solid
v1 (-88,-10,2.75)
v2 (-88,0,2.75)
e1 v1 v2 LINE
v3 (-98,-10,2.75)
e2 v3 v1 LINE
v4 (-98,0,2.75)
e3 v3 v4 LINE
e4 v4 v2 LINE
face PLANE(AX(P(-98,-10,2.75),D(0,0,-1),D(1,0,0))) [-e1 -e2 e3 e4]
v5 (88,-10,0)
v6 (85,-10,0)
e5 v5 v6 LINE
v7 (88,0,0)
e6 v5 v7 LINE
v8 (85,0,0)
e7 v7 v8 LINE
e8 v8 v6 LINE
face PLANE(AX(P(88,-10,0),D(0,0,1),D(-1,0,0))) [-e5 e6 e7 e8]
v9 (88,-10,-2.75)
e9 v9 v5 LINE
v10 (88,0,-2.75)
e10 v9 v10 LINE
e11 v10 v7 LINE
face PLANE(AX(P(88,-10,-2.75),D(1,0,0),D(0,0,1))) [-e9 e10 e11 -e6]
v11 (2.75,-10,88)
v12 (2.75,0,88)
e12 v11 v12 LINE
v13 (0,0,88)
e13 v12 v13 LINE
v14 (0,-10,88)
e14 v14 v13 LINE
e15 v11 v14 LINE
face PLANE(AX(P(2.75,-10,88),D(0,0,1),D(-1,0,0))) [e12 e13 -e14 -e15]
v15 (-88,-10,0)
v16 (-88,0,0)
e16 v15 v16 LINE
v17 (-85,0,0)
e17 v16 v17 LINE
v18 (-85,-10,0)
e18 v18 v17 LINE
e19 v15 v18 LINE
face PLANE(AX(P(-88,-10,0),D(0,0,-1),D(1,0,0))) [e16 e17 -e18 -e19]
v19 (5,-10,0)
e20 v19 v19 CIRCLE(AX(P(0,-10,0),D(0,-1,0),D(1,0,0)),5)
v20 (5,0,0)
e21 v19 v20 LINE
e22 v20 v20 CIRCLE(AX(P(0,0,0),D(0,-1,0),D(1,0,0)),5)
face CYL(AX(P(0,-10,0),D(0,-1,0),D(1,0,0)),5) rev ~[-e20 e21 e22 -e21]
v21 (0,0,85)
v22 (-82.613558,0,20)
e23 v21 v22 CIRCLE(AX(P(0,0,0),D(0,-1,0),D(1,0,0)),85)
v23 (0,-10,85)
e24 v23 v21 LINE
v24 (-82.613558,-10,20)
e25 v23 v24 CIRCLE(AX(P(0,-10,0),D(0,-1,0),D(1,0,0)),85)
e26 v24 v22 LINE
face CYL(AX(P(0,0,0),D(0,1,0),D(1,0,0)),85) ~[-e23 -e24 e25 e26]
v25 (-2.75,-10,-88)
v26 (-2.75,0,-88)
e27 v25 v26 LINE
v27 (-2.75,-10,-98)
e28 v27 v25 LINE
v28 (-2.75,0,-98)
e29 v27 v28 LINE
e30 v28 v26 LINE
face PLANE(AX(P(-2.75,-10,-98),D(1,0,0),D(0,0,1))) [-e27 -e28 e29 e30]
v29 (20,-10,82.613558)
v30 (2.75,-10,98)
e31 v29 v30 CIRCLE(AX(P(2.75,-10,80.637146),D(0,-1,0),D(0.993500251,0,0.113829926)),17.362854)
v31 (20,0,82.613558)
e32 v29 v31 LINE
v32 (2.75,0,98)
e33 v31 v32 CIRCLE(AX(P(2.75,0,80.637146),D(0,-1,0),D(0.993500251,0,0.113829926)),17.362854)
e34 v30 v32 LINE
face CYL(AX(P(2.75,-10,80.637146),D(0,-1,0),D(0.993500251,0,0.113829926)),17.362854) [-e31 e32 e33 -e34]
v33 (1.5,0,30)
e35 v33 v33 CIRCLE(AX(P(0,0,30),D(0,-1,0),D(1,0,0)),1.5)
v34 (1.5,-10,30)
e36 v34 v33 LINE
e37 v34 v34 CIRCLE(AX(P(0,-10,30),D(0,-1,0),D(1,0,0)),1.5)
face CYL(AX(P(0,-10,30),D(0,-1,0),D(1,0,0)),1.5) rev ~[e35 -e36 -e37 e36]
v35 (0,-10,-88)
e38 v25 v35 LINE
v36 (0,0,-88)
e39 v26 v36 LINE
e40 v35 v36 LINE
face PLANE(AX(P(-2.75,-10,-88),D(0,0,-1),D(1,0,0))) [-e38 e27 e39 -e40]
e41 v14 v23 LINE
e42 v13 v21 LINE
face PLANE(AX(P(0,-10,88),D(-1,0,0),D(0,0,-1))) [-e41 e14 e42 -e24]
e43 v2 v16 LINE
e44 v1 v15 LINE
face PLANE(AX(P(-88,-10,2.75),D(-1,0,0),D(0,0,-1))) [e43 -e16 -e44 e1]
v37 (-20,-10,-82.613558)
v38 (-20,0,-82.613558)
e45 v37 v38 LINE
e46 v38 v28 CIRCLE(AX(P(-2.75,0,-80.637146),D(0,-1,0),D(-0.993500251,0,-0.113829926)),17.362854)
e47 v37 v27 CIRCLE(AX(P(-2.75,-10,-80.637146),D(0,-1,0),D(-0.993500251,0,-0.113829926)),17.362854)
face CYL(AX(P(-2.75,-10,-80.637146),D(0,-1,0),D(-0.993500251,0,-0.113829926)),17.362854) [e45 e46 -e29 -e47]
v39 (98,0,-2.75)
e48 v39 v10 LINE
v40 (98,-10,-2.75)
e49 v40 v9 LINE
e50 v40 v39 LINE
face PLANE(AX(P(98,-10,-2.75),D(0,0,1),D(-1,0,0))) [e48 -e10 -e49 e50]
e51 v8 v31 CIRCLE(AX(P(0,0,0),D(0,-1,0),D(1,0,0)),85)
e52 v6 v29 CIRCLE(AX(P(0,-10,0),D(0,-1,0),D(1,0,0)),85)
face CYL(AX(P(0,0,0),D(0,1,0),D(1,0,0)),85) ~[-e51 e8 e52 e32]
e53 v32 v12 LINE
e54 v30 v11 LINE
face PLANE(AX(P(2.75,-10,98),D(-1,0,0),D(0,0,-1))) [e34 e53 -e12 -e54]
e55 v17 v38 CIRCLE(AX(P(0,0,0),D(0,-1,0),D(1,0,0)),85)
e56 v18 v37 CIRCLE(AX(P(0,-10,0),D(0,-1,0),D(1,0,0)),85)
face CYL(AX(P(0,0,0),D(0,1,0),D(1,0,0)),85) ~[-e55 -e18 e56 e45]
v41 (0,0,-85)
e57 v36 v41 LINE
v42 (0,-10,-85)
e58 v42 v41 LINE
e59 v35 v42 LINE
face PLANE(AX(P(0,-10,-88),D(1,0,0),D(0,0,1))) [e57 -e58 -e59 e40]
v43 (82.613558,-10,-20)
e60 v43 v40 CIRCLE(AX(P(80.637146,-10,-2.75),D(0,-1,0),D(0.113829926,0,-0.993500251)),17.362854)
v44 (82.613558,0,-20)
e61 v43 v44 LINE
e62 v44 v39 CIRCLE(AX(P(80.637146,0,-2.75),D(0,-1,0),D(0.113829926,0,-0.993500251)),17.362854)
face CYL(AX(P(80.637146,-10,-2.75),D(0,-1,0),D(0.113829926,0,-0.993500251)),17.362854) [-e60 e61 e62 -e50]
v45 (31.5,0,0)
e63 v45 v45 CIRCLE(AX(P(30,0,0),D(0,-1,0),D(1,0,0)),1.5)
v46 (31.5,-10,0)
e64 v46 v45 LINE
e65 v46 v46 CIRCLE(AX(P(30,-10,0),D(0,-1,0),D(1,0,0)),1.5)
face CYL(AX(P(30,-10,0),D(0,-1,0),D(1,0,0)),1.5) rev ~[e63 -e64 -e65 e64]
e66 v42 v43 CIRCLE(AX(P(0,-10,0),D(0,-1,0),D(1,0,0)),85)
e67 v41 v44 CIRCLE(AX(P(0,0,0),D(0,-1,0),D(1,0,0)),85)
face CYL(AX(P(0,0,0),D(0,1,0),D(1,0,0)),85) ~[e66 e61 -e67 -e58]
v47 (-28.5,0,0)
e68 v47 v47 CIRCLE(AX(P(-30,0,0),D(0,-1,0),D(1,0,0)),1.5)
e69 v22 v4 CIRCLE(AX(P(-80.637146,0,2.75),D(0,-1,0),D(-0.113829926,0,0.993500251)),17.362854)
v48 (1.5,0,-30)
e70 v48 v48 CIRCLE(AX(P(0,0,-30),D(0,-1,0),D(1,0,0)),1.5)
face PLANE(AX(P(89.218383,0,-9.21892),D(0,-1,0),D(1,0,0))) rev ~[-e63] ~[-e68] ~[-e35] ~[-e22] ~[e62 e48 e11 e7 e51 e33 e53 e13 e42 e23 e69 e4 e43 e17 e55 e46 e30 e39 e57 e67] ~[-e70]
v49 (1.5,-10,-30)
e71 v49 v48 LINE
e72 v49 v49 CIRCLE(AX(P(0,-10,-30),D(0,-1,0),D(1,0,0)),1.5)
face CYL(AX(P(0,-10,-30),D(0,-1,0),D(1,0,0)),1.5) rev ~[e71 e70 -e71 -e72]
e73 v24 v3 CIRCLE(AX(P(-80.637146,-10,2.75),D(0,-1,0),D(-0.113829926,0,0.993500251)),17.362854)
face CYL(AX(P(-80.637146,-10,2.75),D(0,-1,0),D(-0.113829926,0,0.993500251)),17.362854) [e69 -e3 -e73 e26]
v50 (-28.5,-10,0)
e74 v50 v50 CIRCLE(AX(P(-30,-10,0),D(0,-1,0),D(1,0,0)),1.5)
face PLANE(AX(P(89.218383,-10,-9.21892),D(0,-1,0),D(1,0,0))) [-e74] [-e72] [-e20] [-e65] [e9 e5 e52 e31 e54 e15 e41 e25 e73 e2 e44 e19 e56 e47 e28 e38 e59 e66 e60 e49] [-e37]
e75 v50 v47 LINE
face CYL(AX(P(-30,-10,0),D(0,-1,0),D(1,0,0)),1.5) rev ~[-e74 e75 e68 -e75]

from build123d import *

# Parameters (mm, degrees)
F0_R     = 85
F1_DEPTH = 10
F3_DEPTH = 10
F4_R     = 5
F4_R_2   = 1.5
F5_DEPTH = 10.001


# Not quite as in the source:
# - a feature names something its author has since deleted; it is built from what else it names


with BuildPart() as f1:
    # F0 (on Front) → F1 (new body)
    with BuildSketch(Plane.XZ):
        Circle(F0_R)
    extrude(amount=F1_DEPTH)

    # F2 (on face) → F3 (join)
    with BuildSketch(Plane.XZ.offset(10)):
        with BuildLine():
            Line((0, 88), (0, 85))
            ThreePointArc((0, 85), (10.0709372009, 84.4012809375), (20, 82.6135582093))
            ThreePointArc((20, 82.6135582093), (14.3075201815, 93.5944770544), (2.75, 98))
            Line((2.75, 98), (2.75, 88))
            Line((2.75, 88), (0, 88))
        make_face()
        with BuildLine():
            ThreePointArc((-85, 0), (-84.4012809375, 10.0709372009), (-82.6135582093, 20))
            ThreePointArc((-82.6135582093, 20), (-93.5944770544, 14.3075201815), (-98, 2.75))
            Line((-98, 2.75), (-88, 2.75))
            Line((-88, 2.75), (-88, 0))
            Line((-88, 0), (-85, 0))
        make_face()
        with BuildLine():
            ThreePointArc((0, -85), (-10.0709372009, -84.4012809375), (-20, -82.6135582093))
            ThreePointArc((-20, -82.6135582093), (-14.3075201815, -93.5944770544), (-2.75, -98))
            Line((-2.75, -98), (-2.75, -88))
            Line((-2.75, -88), (0, -88))
            Line((0, -88), (0, -85))
        make_face()
        with BuildLine():
            Line((88, 0), (85, 0))
            ThreePointArc((85, 0), (84.4012809375, -10.0709372009), (82.6135582093, -20))
            ThreePointArc((82.6135582093, -20), (93.5944770544, -14.3075201815), (98, -2.75))
            Line((98, -2.75), (88, -2.75))
            Line((88, -2.75), (88, 0))
        make_face()
    extrude(amount=-F3_DEPTH)

    # F4 (on face) → F5 (cut, through all)
    with BuildSketch(Plane.XZ.offset(10)):
        Circle(F4_R)
        with Locations((0, 30)):
            Circle(F4_R_2)
        with Locations((30, 0)):
            Circle(F4_R_2)
        with Locations((-30, 0)):
            Circle(F4_R_2)
        with Locations((0, -30)):
            Circle(F4_R_2)
    extrude(amount=-F5_DEPTH, mode=Mode.SUBTRACT)


solid = f1.part
